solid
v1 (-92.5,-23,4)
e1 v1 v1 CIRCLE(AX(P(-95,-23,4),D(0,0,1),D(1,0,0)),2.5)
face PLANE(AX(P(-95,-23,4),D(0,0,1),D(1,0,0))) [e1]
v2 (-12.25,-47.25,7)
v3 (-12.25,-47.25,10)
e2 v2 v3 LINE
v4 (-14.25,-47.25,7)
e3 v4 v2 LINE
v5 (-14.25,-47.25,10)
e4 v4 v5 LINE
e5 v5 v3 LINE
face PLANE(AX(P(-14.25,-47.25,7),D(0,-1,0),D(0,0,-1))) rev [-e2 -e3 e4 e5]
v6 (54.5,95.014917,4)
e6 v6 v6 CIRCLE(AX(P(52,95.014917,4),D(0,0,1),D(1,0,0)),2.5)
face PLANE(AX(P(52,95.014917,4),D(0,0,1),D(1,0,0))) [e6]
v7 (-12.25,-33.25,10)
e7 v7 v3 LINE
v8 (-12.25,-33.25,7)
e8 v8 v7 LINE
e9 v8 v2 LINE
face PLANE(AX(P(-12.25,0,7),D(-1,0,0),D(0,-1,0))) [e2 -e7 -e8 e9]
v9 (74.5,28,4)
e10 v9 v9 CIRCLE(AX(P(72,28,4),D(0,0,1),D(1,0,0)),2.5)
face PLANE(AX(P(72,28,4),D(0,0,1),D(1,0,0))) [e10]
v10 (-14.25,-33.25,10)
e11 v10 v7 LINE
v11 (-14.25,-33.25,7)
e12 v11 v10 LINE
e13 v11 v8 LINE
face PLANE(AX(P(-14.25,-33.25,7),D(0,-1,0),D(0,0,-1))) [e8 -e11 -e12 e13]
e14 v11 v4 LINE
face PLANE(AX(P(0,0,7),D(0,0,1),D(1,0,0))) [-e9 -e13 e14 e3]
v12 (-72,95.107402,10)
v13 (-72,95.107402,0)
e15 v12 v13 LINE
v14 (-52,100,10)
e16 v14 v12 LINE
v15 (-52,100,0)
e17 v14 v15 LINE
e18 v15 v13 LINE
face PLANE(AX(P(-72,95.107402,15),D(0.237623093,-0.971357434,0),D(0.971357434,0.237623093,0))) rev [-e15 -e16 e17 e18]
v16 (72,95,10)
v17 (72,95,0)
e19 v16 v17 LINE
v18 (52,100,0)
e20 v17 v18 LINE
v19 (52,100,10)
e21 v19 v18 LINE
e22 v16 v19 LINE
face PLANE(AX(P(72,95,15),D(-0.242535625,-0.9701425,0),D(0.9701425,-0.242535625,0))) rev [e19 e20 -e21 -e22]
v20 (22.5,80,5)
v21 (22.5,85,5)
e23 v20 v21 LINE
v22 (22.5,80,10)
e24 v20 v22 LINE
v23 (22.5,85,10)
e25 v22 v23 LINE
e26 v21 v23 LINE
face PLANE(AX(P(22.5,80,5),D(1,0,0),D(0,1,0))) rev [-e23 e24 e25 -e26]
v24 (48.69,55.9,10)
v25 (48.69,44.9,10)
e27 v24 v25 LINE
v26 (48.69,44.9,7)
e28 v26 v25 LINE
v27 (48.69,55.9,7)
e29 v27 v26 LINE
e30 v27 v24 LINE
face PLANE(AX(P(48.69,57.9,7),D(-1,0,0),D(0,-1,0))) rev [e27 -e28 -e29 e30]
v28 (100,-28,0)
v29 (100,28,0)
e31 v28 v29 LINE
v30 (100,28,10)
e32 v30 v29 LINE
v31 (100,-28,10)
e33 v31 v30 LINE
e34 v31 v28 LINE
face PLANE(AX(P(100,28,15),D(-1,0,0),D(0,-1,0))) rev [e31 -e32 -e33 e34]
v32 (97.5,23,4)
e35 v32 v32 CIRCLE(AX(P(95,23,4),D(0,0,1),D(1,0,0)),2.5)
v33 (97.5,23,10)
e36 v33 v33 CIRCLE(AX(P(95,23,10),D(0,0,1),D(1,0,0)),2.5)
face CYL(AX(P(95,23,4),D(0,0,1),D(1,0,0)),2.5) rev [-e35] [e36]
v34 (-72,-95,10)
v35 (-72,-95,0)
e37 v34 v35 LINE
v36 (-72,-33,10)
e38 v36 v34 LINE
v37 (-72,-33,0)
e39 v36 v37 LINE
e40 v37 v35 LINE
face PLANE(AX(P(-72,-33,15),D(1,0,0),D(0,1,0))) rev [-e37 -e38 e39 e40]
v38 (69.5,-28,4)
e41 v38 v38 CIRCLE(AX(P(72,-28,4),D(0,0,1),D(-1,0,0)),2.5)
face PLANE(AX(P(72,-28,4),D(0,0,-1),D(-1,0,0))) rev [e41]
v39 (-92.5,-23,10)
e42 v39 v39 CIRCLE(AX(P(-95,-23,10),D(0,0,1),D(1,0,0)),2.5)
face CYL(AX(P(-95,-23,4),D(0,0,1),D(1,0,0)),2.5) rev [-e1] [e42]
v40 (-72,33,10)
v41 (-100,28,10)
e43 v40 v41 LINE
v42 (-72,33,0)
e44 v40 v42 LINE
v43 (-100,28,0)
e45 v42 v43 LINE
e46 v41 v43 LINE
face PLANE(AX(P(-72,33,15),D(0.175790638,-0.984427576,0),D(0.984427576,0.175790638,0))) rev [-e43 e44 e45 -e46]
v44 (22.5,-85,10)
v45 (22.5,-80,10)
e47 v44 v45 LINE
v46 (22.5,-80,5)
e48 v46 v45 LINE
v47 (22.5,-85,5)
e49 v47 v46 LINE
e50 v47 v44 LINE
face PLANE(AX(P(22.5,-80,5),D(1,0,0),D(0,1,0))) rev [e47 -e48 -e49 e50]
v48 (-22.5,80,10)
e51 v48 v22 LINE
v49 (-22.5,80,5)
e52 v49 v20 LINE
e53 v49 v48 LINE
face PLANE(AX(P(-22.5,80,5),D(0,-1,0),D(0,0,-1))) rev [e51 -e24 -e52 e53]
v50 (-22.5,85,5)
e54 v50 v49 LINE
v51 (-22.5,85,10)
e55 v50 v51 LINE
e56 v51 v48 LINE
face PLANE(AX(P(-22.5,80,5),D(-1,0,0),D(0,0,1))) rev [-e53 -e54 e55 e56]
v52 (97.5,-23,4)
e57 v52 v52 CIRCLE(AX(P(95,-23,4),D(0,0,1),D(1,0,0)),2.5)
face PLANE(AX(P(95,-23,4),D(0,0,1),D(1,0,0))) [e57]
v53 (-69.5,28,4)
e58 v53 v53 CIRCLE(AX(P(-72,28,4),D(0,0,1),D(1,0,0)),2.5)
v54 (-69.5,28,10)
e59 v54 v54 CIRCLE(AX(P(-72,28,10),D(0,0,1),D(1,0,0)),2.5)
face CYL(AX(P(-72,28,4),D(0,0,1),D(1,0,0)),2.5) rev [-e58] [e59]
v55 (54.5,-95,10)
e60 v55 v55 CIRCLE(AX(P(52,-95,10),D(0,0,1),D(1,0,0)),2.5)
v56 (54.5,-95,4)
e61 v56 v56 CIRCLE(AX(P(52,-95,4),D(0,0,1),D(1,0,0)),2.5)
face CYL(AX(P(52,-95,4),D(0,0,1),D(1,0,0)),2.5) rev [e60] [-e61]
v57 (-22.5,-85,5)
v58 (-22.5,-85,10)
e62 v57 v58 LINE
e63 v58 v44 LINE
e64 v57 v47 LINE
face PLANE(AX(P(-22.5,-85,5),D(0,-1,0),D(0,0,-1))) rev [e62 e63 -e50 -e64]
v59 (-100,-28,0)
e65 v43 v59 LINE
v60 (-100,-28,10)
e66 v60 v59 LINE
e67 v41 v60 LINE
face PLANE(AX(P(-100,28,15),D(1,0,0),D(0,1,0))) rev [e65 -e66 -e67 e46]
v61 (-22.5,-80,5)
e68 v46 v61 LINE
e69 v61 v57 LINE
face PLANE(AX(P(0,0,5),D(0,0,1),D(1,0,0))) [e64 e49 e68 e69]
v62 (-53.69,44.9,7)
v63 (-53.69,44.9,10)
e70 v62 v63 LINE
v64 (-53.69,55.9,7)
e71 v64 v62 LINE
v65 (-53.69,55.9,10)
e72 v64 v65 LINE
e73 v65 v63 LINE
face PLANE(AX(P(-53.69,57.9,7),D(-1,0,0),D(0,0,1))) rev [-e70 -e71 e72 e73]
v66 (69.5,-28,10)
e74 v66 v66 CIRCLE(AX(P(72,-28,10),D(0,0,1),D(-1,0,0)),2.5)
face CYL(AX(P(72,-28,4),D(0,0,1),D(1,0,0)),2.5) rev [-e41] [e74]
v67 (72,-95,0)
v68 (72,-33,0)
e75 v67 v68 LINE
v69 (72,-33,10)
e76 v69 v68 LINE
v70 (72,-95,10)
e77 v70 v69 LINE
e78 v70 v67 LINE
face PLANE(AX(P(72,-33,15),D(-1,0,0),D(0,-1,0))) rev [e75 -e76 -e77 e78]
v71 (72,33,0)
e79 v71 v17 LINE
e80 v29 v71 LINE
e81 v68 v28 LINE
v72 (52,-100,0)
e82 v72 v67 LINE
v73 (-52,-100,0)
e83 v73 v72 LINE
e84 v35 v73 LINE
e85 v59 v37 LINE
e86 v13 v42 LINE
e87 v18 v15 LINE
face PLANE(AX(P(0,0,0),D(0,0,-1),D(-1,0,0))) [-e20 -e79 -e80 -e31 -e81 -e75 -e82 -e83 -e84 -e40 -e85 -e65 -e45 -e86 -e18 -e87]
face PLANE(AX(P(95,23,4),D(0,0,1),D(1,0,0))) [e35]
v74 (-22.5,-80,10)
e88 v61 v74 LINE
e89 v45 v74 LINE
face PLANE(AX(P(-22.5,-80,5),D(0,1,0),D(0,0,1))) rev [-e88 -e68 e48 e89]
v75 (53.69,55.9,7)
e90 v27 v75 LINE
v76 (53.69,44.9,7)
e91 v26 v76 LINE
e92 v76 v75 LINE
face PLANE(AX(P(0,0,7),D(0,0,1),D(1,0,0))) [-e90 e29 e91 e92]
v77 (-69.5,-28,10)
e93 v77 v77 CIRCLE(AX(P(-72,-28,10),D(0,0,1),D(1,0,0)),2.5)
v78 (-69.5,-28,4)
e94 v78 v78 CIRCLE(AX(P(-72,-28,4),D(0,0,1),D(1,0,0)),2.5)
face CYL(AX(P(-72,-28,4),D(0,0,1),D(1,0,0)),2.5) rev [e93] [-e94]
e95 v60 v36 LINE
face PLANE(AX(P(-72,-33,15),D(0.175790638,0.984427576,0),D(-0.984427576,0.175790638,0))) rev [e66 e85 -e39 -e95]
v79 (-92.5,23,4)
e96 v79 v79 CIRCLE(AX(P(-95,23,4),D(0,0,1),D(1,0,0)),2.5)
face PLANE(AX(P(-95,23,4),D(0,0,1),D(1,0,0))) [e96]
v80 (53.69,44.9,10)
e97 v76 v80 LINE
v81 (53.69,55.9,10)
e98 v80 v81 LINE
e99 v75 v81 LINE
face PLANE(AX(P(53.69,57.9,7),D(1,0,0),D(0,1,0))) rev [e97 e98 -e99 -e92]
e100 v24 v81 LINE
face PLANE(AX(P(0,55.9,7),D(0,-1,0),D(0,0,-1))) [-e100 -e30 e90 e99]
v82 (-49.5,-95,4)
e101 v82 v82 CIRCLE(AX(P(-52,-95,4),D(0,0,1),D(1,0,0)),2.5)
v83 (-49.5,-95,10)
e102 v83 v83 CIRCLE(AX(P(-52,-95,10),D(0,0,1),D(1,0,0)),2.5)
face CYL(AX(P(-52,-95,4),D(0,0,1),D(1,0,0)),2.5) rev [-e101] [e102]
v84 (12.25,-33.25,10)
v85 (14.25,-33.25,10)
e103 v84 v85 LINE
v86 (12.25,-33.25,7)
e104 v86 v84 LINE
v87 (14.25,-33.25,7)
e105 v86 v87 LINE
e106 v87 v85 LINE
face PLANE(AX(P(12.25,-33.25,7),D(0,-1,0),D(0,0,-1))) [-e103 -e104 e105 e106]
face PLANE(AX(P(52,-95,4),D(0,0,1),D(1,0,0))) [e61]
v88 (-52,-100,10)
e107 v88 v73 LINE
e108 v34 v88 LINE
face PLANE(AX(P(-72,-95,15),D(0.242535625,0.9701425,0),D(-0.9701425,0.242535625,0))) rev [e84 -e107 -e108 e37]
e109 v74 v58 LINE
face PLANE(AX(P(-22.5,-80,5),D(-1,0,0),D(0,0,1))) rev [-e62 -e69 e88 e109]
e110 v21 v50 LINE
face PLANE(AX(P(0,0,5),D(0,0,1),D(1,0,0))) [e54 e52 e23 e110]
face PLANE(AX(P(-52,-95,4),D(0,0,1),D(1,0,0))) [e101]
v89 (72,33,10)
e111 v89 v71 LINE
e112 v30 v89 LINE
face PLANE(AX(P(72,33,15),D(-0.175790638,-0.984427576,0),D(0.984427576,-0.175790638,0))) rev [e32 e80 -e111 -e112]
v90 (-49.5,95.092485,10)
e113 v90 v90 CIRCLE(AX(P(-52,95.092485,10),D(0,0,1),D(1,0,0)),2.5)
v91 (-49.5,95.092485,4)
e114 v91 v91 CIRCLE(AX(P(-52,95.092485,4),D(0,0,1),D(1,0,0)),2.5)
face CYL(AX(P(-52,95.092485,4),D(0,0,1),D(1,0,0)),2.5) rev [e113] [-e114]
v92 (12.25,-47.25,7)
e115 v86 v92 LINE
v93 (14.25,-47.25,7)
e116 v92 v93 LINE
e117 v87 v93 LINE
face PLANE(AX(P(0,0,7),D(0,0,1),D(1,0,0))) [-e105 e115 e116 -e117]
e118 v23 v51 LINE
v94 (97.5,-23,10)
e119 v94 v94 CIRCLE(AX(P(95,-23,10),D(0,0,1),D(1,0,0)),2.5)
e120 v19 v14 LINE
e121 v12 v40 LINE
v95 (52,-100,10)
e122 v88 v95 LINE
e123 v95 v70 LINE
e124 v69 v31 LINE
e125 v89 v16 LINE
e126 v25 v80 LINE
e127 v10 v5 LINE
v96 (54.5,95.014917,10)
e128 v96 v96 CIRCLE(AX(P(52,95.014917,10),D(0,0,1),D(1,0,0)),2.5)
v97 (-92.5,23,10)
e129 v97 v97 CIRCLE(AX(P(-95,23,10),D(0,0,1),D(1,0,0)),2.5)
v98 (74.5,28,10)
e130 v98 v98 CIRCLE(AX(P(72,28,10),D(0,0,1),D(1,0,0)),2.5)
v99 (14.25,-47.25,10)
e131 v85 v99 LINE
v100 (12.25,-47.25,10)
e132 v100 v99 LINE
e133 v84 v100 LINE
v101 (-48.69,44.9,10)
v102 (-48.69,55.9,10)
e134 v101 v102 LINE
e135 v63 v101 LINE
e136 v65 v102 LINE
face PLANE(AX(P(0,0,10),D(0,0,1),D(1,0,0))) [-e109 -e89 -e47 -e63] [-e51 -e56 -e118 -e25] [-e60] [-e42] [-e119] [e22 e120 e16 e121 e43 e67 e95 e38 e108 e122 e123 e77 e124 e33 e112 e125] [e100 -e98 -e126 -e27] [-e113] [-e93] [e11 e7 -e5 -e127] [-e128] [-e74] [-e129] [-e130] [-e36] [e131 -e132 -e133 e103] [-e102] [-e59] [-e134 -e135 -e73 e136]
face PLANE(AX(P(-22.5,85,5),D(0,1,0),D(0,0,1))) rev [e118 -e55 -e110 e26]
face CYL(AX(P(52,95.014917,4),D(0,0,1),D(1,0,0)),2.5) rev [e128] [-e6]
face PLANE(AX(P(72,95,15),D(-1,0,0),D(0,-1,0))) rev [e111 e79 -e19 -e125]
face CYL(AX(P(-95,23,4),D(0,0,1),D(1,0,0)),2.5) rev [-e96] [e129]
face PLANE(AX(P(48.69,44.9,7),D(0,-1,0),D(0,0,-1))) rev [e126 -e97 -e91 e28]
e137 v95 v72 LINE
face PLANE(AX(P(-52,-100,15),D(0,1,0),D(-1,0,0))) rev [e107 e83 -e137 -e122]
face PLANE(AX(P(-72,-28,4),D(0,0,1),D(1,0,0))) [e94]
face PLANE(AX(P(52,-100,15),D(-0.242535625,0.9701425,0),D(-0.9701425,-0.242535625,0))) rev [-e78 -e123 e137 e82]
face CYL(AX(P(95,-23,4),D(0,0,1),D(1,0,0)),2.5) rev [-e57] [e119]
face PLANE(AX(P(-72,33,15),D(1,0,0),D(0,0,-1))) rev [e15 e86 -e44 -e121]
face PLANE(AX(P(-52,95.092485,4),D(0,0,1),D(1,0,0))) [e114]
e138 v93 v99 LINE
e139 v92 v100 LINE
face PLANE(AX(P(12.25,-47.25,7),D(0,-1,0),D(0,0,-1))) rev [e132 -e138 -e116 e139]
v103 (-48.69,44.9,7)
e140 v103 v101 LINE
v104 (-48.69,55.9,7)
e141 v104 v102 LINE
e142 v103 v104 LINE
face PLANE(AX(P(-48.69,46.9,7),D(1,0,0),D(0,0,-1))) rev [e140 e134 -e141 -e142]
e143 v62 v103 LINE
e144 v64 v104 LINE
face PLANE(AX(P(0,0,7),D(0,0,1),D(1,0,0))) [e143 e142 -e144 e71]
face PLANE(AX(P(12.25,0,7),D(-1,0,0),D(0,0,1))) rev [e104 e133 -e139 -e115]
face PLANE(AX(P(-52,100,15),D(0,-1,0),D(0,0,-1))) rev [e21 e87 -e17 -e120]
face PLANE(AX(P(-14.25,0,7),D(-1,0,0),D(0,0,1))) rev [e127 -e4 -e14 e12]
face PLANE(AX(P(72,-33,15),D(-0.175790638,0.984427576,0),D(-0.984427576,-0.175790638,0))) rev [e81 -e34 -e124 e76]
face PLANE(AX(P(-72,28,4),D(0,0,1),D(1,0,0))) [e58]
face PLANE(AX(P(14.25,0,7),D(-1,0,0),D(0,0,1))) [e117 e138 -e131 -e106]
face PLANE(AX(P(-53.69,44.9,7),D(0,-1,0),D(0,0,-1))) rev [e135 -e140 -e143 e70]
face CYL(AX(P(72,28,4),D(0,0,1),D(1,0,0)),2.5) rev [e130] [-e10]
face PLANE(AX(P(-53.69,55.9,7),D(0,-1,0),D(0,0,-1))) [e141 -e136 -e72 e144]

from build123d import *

# Parameters (mm, degrees)
BOSS_EXTRUDE2_DEPTH  = 15
SKETCH2_W            = 3
SKETCH2_H            = 20
CUT_EXTRUDE2_DEPTH   = 10
SKETCH4_W            = 3
SKETCH4_H            = 20
BOSS_EXTRUDE5_DEPTH  = 10
CUT_EXTRUDE3_DEPTH   = 5
SKETCH6_R            = 2.5
CUT_EXTRUDE4_DEPTH   = 6
SKETCH7_R            = 2.5
BOSS_EXTRUDE6_DEPTH  = 6
SKETCH8_R            = 2.5
CUT_EXTRUDE5_DEPTH   = 6
SKETCH9_W            = 2
SKETCH9_H            = 14
CUT_EXTRUDE6_DEPTH   = 3
SKETCH10_W           = 5
SKETCH10_H           = 11
CUT_EXTRUDE7_DEPTH   = 3
BOSS_EXTRUDE8_DEPTH  = 3
SKETCH12_W           = 5
SKETCH12_H           = 2
CUT_EXTRUDE8_DEPTH   = 3
SKETCH14_W           = 5
SKETCH14_H           = 7.25
BOSS_EXTRUDE9_DEPTH  = 3
SKETCH15_W           = 5
SKETCH15_H           = 7.25
CUT_EXTRUDE9_DEPTH   = 3
SKETCH16_W           = 5
SKETCH16_H           = 7.25
BOSS_EXTRUDE10_DEPTH = 3
SKETCH17_W           = 5
SKETCH17_H           = 7.25
CUT_EXTRUDE10_DEPTH  = 3
SKETCH18_W           = 5
SKETCH18_H           = 7.25
BOSS_EXTRUDE11_DEPTH = 3
SKETCH19_W           = 5
SKETCH19_H           = 7.25
CUT_EXTRUDE11_DEPTH  = 3
SKETCH20_W           = 5
SKETCH20_H           = 7.25
BOSS_EXTRUDE12_DEPTH = 3
SKETCH21_W           = 5
SKETCH21_H           = 7.25
CUT_EXTRUDE12_DEPTH  = 3
SKETCH22_W           = 2
SKETCH22_H           = 7.25
CUT_EXTRUDE13_DEPTH  = 3
SKETCH23_W           = 2
SKETCH23_H           = 7.25
BOSS_EXTRUDE13_DEPTH = 3
SKETCH24_W           = 45
SKETCH24_H           = 5
CUT_EXTRUDE14_DEPTH  = 5
SKETCH25_W           = 45
SKETCH25_H           = 5
BOSS_EXTRUDE17_DEPTH = 5
SKETCH26_W           = 45
SKETCH26_H           = 5
CUT_EXTRUDE16_DEPTH  = 5


with BuildPart() as part:
    # Sketch1 → Boss-Extrude2 (new body)
    with BuildSketch(Plane.XY):
        Polygon((-52, 100), (52, 100), (72, 95), (72, 33), (100, 28), (100, -28), (72, -33), (72, -95), (52, -100), (-52, -100), (-72, -95), (-72, -33), (-100, -28), (-100, 28), (-72, 33), (-72, 95.107401563), align=None)
    extrude(amount=BOSS_EXTRUDE2_DEPTH)

    # Sketch2 → Cut-Extrude2 (cut)
    with BuildSketch(Plane.XY.offset(15)):
        with Locations((-69.5, 80.352031484)):
            Rectangle(SKETCH2_W, SKETCH2_H)
        with Locations((-69.5, 43)):
            Rectangle(SKETCH2_W, SKETCH2_H)
    extrude(amount=-CUT_EXTRUDE2_DEPTH, mode=Mode.SUBTRACT)

    # Sketch4 → Boss-Extrude5 (add)
    with BuildSketch(Plane.XY.offset(15)):
        Polygon((-71, 90.352031484), (-68, 90.352031484), (-68, 70.352031484), (-69.5, 70.352031484), (-71, 70.352031484), align=None)
        with Locations((-69.5, 43)):
            Rectangle(SKETCH4_W, SKETCH4_H)
    extrude(amount=-BOSS_EXTRUDE5_DEPTH)

    # Sketch5 → Cut-Extrude3 (cut)
    with BuildSketch(Plane.XY.offset(15)):
        Polygon((-72, 95.107401563), (-72, 33), (-100, 28), (-100, -28), (-72, -33), (-72, -95), (-52, -100), (52, -100), (72, -95), (72, -33), (100, -28), (100, 28), (72, 33), (72, 95), (52, 100), (-52, 100), align=None)
    extrude(amount=-CUT_EXTRUDE3_DEPTH, mode=Mode.SUBTRACT)

    # Sketch6 → Cut-Extrude4 (cut)
    with BuildSketch(Plane.XY.offset(10)):
        with Locations((-95, -23)):
            Circle(SKETCH6_R)
        with Locations((-72, 28)):
            Circle(SKETCH6_R)
        with Locations((-72, -28)):
            Circle(SKETCH6_R)
        with Locations((-52, -95)):
            Circle(SKETCH6_R)
        with Locations((52, -95)):
            Circle(SKETCH6_R)
        with Locations((67, -28)):
            Circle(SKETCH6_R)
        with Locations((72, 28)):
            Circle(SKETCH6_R)
        with Locations((95, 23)):
            Circle(SKETCH6_R)
        with Locations((-52, 95.092484679)):
            Circle(SKETCH6_R)
        with Locations((52, 95.014916884)):
            Circle(SKETCH6_R)
        with Locations((95, -23)):
            Circle(SKETCH6_R)
        with Locations((-95, 23)):
            Circle(SKETCH6_R)
    extrude(amount=-CUT_EXTRUDE4_DEPTH, mode=Mode.SUBTRACT)

    # Sketch7 → Boss-Extrude6 (add)
    with BuildSketch(Plane.XY.offset(10)):
        with Locations((67, -28)):
            Circle(SKETCH7_R)
    extrude(amount=-BOSS_EXTRUDE6_DEPTH)

    # Sketch8 → Cut-Extrude5 (cut)
    with BuildSketch(Plane.XY.offset(10)):
        with Locations((-72, -28)):
            Circle(SKETCH8_R)
        with Locations((72, -28)):
            Circle(SKETCH8_R)
    extrude(amount=-CUT_EXTRUDE5_DEPTH, mode=Mode.SUBTRACT)

    # Sketch9 → Cut-Extrude6 (cut)
    with BuildSketch(Plane.XY.offset(10)):
        with Locations((-13.25, -33)):
            Rectangle(SKETCH9_W, SKETCH9_H)
        with Locations((13.25, -33)):
            Rectangle(SKETCH9_W, SKETCH9_H)
    extrude(amount=-CUT_EXTRUDE6_DEPTH, mode=Mode.SUBTRACT)

    # Sketch10 → Cut-Extrude7 (cut)
    with BuildSketch(Plane.XY.offset(10)):
        with Locations((-51.19, 52.4)):
            Rectangle(SKETCH10_W, SKETCH10_H)
        with Locations((51.19, 52.4)):
            Rectangle(SKETCH10_W, SKETCH10_H)
    extrude(amount=-CUT_EXTRUDE7_DEPTH, mode=Mode.SUBTRACT)

    # Sketch11 → Boss-Extrude8 (add)
    with BuildSketch(Plane.XY.offset(10)):
        Polygon((-53.69, 55.9), (-48.69, 55.9), (-48.69, 57.549860814), (-48.69, 57.9), (-53.69, 57.9), align=None)
        Polygon((53.69, 57.9), (48.69, 57.9), (48.69, 55.9), (53.69, 55.9), (53.69, 57.549860814), align=None)
    extrude(amount=-BOSS_EXTRUDE8_DEPTH)

    # Sketch12 → Cut-Extrude8 (cut)
    with BuildSketch(Plane.XY.offset(10)):
        with Locations((-51.19, 45.9)):
            Rectangle(SKETCH12_W, SKETCH12_H)
        Polygon((53.69, 46.9), (48.69, 46.9), (48.69, 44.9), (53.69, 44.9), (53.69, 45.878343836), align=None)
    extrude(amount=-CUT_EXTRUDE8_DEPTH, mode=Mode.SUBTRACT)

    # Sketch14 → Boss-Extrude9 (add)
    with BuildSketch(Plane.XY.offset(10)):
        with Locations((-51.19, 48.525)):
            Rectangle(SKETCH14_W, SKETCH14_H)
    extrude(amount=-BOSS_EXTRUDE9_DEPTH)

    # Sketch15 → Cut-Extrude9 (cut)
    with BuildSketch(Plane.XY.offset(10)):
        with Locations((-51.19, 59.525)):
            Rectangle(SKETCH15_W, SKETCH15_H)
    extrude(amount=-CUT_EXTRUDE9_DEPTH, mode=Mode.SUBTRACT)

    # Sketch16 → Boss-Extrude10 (add)
    with BuildSketch(Plane.XY.offset(10)):
        with Locations((51.19, 48.525)):
            Rectangle(SKETCH16_W, SKETCH16_H)
    extrude(amount=-BOSS_EXTRUDE10_DEPTH)

    # Sketch17 → Cut-Extrude10 (cut)
    with BuildSketch(Plane.XY.offset(10)):
        with Locations((51.19, 59.525)):
            Rectangle(SKETCH17_W, SKETCH17_H)
    extrude(amount=-CUT_EXTRUDE10_DEPTH, mode=Mode.SUBTRACT)

    # Sketch18 → Boss-Extrude11 (add)
    with BuildSketch(Plane.XY.offset(10)):
        with Locations((-51.19, 59.525)):
            Rectangle(SKETCH18_W, SKETCH18_H)
    extrude(amount=-BOSS_EXTRUDE11_DEPTH)

    # Sketch19 → Cut-Extrude11 (cut)
    with BuildSketch(Plane.XY.offset(10)):
        with Locations((-51.19, 48.525)):
            Rectangle(SKETCH19_W, SKETCH19_H)
    extrude(amount=-CUT_EXTRUDE11_DEPTH, mode=Mode.SUBTRACT)

    # Sketch20 → Boss-Extrude12 (add)
    with BuildSketch(Plane.XY.offset(10)):
        with Locations((51.19, 59.525)):
            Rectangle(SKETCH20_W, SKETCH20_H)
    extrude(amount=-BOSS_EXTRUDE12_DEPTH)

    # Sketch21 → Cut-Extrude12 (cut)
    with BuildSketch(Plane.XY.offset(10)):
        with Locations((51.19, 48.525)):
            Rectangle(SKETCH21_W, SKETCH21_H)
    extrude(amount=-CUT_EXTRUDE12_DEPTH, mode=Mode.SUBTRACT)

    # Sketch22 → Cut-Extrude13 (cut)
    with BuildSketch(Plane.XY.offset(10)):
        with Locations((-13.25, -43.625)):
            Rectangle(SKETCH22_W, SKETCH22_H)
        with Locations((13.25, -43.625)):
            Rectangle(SKETCH22_W, SKETCH22_H)
    extrude(amount=-CUT_EXTRUDE13_DEPTH, mode=Mode.SUBTRACT)

    # Sketch23 → Boss-Extrude13 (add)
    with BuildSketch(Plane.XY.offset(10)):
        with Locations((-13.25, -29.625)):
            Rectangle(SKETCH23_W, SKETCH23_H)
        with Locations((13.25, -29.625)):
            Rectangle(SKETCH23_W, SKETCH23_H)
    extrude(amount=-BOSS_EXTRUDE13_DEPTH)

    # Sketch24 → Cut-Extrude14 (cut)
    with BuildSketch(Plane.XY.offset(10)):
        with Locations((0, 95.053700781)):
            Rectangle(SKETCH24_W, SKETCH24_H)
        with Locations((0, -95)):
            Rectangle(SKETCH24_W, SKETCH24_H)
    extrude(amount=-CUT_EXTRUDE14_DEPTH, mode=Mode.SUBTRACT)

    # Sketch25 → Boss-Extrude17 (add)
    with BuildSketch(Plane.XY.offset(5)):
        with Locations((0, 95.053700781)):
            Rectangle(SKETCH25_W, SKETCH25_H)
        with Locations((0, -95)):
            Rectangle(SKETCH25_W, SKETCH25_H)
    extrude(amount=BOSS_EXTRUDE17_DEPTH)

    # Sketch26 → Cut-Extrude16 (cut)
    with BuildSketch(Plane.XY.offset(10)):
        with Locations((0, -82.5)):
            Rectangle(SKETCH26_W, SKETCH26_H)
        with Locations((0, 82.5)):
            Rectangle(SKETCH26_W, SKETCH26_H)
    extrude(amount=-CUT_EXTRUDE16_DEPTH, mode=Mode.SUBTRACT)


solid = part.part
